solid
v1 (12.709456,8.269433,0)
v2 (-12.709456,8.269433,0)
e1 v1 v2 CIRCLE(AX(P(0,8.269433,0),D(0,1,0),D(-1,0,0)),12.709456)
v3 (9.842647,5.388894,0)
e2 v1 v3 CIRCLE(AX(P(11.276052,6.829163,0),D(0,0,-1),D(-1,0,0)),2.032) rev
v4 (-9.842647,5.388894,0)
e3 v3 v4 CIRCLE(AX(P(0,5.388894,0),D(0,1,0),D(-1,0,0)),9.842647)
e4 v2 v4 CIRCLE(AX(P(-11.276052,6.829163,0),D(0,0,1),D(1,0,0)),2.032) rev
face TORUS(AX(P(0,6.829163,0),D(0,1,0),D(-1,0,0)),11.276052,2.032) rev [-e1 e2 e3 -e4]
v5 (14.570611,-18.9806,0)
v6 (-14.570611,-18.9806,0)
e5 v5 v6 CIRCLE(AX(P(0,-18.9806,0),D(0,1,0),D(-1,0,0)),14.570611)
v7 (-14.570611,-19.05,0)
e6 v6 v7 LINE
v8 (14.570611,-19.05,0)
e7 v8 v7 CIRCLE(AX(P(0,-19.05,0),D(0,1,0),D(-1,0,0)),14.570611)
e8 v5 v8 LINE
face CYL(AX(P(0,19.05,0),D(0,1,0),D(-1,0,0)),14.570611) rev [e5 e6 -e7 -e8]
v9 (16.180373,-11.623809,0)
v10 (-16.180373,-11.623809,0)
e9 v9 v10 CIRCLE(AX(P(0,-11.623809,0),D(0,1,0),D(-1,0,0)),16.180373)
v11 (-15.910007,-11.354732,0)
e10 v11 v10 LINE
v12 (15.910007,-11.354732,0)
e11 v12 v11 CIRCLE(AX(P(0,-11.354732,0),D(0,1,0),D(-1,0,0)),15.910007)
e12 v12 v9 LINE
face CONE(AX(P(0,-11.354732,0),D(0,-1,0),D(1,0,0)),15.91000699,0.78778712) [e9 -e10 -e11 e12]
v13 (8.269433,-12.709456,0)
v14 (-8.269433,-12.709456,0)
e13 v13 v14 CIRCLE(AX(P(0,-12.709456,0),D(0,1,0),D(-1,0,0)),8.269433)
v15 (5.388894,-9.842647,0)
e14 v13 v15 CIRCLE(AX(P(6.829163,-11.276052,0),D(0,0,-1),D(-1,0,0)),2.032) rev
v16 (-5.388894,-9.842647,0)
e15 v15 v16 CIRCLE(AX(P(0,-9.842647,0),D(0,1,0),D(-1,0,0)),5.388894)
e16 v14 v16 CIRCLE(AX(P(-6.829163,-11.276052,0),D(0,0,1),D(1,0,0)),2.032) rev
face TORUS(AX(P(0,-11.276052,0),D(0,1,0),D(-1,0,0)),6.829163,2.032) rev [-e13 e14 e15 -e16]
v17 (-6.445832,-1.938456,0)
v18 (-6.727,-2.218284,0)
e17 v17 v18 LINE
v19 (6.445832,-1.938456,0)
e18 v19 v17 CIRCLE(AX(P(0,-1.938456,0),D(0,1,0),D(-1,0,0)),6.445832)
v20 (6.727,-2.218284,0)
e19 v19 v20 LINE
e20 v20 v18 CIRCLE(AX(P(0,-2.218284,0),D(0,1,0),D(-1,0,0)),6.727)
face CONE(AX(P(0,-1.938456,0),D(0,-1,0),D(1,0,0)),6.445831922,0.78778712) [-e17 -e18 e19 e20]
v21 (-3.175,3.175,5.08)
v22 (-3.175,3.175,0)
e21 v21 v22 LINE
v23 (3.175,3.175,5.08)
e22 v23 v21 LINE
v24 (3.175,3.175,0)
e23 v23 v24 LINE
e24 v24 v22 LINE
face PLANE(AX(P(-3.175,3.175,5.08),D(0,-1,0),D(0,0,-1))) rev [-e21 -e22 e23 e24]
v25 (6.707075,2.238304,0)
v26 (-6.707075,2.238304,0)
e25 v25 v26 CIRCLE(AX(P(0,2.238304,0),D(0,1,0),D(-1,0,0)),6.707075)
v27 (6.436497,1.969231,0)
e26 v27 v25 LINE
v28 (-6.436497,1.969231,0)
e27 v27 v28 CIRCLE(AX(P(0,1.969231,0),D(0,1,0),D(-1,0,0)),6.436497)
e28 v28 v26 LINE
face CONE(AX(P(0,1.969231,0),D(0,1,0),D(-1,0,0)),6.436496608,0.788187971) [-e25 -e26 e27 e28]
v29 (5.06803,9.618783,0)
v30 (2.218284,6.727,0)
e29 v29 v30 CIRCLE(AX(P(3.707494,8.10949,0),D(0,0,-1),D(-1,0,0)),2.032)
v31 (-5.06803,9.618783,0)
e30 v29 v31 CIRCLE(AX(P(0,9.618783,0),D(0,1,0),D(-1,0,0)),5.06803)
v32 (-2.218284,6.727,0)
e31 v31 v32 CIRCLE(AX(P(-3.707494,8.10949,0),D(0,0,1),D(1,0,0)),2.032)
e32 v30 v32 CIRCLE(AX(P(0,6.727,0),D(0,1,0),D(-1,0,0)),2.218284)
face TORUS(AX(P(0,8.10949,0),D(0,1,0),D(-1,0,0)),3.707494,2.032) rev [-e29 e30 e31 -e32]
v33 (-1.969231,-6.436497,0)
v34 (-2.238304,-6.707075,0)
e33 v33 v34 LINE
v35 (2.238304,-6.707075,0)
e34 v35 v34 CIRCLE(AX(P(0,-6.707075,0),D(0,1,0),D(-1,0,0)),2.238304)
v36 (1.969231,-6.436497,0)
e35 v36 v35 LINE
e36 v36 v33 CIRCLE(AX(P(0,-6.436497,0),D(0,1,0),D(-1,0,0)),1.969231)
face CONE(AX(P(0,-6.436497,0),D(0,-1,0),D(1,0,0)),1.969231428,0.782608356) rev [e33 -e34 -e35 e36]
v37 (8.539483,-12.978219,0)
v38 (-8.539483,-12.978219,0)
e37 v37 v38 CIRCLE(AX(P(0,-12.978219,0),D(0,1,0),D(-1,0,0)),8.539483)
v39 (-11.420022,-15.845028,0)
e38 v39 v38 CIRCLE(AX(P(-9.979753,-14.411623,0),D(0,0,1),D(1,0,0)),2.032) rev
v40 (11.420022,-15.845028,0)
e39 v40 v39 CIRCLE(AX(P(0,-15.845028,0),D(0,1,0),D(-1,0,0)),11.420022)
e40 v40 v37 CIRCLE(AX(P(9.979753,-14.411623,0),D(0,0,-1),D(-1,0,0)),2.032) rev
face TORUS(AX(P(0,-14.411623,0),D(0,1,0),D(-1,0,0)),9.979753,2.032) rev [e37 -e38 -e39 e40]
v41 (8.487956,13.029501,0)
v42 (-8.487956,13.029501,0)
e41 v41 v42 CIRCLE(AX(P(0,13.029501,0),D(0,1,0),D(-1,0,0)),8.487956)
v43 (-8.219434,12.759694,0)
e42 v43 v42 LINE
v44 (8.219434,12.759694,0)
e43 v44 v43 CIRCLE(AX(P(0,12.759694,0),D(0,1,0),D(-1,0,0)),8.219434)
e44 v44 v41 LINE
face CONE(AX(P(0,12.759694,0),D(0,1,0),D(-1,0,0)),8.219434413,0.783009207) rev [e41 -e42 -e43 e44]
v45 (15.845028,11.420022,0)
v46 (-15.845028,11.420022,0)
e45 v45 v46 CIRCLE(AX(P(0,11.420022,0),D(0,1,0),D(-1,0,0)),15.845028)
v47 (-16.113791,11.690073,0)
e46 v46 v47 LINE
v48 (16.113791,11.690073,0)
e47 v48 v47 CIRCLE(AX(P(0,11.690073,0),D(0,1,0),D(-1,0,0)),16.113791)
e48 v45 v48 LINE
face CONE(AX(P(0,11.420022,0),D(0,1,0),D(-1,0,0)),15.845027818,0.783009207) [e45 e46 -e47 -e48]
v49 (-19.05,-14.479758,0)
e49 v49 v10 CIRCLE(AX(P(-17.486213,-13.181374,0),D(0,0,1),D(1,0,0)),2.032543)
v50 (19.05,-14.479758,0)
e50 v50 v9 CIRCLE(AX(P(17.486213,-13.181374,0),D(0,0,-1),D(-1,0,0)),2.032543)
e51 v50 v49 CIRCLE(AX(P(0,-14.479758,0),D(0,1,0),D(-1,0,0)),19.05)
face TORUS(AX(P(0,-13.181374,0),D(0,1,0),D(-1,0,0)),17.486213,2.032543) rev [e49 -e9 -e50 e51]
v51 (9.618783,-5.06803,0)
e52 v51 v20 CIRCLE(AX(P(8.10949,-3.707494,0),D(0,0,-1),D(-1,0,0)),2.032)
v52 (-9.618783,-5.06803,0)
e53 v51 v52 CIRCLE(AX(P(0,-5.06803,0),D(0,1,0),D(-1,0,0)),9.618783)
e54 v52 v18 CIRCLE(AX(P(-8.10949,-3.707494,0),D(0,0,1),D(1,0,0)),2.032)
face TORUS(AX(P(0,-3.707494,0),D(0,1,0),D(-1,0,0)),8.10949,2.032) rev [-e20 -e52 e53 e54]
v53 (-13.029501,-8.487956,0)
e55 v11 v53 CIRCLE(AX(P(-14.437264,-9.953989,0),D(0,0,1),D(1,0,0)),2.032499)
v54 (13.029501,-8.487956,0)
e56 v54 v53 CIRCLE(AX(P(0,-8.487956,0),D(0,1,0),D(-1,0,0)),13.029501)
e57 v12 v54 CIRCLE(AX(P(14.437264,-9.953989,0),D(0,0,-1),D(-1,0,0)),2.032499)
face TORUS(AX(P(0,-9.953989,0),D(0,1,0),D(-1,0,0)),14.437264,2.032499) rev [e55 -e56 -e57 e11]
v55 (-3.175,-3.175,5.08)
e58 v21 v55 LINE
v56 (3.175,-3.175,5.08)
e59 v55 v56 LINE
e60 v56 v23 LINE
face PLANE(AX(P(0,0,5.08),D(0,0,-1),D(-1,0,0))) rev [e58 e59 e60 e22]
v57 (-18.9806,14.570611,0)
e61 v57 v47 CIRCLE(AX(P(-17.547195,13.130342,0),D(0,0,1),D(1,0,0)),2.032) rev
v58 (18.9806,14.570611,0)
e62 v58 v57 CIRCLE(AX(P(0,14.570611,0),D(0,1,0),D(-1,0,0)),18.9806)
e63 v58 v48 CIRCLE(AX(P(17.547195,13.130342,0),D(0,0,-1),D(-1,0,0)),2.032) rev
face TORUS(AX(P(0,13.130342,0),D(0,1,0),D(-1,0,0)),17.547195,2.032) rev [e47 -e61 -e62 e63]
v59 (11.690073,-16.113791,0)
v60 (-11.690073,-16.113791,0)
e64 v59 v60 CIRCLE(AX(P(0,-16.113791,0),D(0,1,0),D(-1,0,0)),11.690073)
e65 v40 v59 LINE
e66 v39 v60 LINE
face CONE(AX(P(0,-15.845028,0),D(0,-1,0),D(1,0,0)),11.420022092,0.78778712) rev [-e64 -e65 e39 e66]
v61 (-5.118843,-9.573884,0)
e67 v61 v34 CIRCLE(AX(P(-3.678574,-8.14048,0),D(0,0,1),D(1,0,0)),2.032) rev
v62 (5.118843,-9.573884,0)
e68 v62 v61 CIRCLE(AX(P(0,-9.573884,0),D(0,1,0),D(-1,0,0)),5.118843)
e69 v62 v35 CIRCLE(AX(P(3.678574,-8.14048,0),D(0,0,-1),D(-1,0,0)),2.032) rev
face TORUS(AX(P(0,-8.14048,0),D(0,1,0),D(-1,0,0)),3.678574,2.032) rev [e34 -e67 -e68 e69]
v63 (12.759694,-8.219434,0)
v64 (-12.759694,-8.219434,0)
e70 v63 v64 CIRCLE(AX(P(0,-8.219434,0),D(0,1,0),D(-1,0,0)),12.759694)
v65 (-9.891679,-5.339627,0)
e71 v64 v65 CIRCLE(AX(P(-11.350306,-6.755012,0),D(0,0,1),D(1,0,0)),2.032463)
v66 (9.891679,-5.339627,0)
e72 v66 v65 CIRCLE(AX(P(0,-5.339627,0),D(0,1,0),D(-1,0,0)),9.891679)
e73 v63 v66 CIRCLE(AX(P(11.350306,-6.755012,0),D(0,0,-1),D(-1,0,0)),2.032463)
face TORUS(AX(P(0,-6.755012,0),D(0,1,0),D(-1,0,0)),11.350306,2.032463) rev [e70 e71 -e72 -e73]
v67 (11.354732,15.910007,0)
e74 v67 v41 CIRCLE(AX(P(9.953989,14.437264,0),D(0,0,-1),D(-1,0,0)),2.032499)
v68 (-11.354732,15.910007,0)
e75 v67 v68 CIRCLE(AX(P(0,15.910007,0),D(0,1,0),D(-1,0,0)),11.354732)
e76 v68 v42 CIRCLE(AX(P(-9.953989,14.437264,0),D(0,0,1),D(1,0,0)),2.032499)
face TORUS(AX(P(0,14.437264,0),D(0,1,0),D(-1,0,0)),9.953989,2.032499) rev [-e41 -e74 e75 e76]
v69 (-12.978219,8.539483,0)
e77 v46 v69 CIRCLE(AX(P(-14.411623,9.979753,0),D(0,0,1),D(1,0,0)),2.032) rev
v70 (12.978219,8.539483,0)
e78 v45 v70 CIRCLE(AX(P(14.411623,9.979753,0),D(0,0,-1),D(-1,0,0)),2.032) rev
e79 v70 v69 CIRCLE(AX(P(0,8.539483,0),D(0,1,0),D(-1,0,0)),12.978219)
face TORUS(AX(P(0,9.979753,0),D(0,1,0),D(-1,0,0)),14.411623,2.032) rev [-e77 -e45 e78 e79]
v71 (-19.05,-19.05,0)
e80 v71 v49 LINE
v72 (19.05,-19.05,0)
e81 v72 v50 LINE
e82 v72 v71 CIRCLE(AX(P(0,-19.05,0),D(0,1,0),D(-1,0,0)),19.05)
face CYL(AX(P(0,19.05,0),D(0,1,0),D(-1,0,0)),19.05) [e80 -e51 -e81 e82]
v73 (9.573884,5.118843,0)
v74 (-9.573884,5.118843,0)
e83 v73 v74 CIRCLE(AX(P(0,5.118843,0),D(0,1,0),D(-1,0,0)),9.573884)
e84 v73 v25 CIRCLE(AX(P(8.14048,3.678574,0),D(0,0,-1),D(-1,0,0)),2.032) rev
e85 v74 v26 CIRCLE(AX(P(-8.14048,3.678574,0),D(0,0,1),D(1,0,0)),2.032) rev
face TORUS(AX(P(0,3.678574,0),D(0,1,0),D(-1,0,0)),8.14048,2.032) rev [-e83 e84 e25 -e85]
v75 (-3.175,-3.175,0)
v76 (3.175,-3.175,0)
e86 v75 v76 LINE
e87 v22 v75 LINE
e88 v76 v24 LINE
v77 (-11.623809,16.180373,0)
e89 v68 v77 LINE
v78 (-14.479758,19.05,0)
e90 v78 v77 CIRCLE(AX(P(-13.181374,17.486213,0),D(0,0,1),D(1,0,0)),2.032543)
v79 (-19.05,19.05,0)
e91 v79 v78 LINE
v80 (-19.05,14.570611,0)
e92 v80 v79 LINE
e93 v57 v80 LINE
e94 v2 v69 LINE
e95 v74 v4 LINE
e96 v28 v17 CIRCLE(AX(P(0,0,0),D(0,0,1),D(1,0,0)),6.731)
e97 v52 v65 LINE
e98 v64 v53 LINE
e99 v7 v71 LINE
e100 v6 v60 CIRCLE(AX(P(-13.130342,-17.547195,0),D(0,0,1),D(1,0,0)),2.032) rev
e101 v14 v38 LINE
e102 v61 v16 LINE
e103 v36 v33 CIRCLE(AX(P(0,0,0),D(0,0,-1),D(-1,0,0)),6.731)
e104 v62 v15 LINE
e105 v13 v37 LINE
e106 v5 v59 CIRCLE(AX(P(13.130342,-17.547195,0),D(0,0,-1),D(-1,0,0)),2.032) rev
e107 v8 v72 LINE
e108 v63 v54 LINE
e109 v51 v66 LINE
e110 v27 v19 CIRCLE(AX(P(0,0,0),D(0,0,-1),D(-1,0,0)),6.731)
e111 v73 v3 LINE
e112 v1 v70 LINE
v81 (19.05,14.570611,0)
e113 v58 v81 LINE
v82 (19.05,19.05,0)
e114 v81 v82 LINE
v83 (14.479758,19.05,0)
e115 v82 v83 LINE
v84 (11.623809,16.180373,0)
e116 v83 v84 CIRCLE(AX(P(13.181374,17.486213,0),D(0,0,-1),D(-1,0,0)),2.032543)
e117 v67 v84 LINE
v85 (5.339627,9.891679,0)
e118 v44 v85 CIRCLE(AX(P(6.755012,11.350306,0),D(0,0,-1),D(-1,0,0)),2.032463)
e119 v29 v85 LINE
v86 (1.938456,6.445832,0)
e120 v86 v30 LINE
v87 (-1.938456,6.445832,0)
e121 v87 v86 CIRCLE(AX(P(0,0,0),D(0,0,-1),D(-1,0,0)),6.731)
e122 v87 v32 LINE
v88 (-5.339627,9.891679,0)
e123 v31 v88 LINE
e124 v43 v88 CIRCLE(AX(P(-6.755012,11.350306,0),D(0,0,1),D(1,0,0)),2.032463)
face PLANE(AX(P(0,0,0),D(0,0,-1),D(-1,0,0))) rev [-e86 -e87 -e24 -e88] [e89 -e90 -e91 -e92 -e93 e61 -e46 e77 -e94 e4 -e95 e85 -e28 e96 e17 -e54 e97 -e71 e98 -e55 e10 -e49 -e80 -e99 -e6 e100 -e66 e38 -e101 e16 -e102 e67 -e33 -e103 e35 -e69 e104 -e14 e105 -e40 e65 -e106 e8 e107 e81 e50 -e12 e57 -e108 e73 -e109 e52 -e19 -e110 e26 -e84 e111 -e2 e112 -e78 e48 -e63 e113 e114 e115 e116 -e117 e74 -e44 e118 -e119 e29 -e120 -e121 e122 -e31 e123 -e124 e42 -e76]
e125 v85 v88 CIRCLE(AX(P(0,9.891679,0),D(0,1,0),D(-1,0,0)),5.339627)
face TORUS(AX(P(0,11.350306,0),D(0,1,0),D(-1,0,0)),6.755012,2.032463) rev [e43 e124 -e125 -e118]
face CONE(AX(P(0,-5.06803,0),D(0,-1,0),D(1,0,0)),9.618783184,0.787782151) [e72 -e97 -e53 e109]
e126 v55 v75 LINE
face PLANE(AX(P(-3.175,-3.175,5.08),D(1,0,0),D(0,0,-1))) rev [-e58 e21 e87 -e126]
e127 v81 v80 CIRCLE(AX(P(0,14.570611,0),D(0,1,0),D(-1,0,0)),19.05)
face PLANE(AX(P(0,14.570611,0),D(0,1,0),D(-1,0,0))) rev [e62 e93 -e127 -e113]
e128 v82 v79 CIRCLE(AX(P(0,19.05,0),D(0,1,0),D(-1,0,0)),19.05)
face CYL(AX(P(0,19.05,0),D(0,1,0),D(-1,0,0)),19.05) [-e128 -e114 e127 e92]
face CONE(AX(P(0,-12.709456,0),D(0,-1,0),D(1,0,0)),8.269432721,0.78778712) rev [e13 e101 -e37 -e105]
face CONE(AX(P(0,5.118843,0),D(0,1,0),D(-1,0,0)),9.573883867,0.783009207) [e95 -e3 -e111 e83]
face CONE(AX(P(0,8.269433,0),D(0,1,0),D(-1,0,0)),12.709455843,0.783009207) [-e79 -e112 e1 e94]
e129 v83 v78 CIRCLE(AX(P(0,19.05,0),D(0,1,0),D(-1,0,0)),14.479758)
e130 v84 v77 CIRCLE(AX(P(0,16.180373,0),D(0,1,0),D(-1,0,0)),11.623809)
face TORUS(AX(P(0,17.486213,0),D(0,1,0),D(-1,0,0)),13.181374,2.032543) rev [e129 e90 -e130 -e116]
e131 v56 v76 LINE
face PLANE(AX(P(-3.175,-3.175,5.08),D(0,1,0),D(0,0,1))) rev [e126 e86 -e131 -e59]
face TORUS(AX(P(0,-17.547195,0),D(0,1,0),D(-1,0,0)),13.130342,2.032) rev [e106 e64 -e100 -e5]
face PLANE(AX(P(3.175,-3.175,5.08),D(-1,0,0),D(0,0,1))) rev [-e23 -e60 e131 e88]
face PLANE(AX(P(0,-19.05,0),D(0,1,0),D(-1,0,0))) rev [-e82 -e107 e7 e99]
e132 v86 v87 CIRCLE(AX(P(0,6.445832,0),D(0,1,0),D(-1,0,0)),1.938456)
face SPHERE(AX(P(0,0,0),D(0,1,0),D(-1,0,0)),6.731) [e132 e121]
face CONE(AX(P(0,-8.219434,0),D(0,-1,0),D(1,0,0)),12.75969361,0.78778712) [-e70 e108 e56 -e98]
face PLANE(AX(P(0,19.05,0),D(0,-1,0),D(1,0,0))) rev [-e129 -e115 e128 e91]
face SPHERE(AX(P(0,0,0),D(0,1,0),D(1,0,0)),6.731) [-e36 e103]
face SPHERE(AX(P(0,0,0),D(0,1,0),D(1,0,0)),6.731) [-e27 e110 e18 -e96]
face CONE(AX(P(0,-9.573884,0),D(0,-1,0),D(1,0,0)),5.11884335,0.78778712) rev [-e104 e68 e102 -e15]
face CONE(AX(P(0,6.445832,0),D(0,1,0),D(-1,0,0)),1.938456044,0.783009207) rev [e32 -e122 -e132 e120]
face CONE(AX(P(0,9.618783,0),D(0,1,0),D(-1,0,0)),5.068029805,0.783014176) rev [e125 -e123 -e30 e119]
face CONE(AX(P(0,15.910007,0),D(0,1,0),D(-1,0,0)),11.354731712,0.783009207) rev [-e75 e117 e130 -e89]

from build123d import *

# Parameters (mm, degrees)
SPHERICON_REVOLVE_ANGLE = 180
SKETCH2_W               = 6.35
SKETCH2_H               = 6.35
MALE_EXTRUDE_DEPTH      = 5.08


with BuildPart() as part:
    # Sketch1 → Sphericon Revolve (revolve)
    with BuildSketch(Plane.XY):
        with BuildLine():
            Line((-19.05, 14.570611464), (-18.980599794, 14.570611464))
            ThreePointArc((-18.980599794, 14.570611464), (-16.106926035, 14.563746368), (-16.11379113, 11.69007261))
            Line((-16.11379113, 11.69007261), (-15.845027818, 11.420022092))
            ThreePointArc((-15.845027818, 11.420022092), (-12.97135406, 11.413156997), (-12.978219155, 8.539483239))
            Line((-12.978219155, 8.539483239), (-12.709455843, 8.269432721))
            ThreePointArc((-12.709455843, 8.269432721), (-9.835782084, 8.262567626), (-9.842647179, 5.388893867))
            Line((-9.842647179, 5.388893867), (-9.573883867, 5.11884335))
            ThreePointArc((-9.573883867, 5.11884335), (-6.700210109, 5.111978254), (-6.707075204, 2.238304496))
            Line((-6.707075204, 2.238304496), (-6.436496608, 1.969231428))
            ThreePointArc((-6.436496608, 1.969231428), (-6.730980793, 0.016080052), (-6.445831922, -1.938456044))
            Line((-6.445831922, -1.938456044), (-6.727000174, -2.218284098))
            ThreePointArc((-6.727000174, -2.218284098), (-6.683206893, -5.154816446), (-9.618783184, -5.068029805))
            Line((-9.618783184, -5.068029805), (-9.891678831, -5.339627385))
            ThreePointArc((-9.891678831, -5.339627385), (-9.910192139, -8.189228808), (-12.75969361, -8.219434413))
            Line((-12.75969361, -8.219434413), (-13.029501015, -8.487955771))
            ThreePointArc((-13.029501015, -8.487955771), (-13.003508284, -11.394611844), (-15.91000699, -11.354731712))
            Line((-15.91000699, -11.354731712), (-16.180372544, -11.623808559))
            ThreePointArc((-16.180372544, -11.623808559), (-16.052425661, -14.622028438), (-19.05, -14.479757834))
            Line((-19.05, -14.479757834), (-19.05, -19.05))
            Line((-19.05, -19.05), (-14.570611464, -19.05))
            Line((-14.570611464, -19.05), (-14.570611464, -18.980599794))
            ThreePointArc((-14.570611464, -18.980599794), (-14.563746368, -16.106926035), (-11.69007261, -16.11379113))
            Line((-11.69007261, -16.11379113), (-11.420022092, -15.845027818))
            ThreePointArc((-11.420022092, -15.845027818), (-11.413156997, -12.97135406), (-8.539483239, -12.978219155))
            Line((-8.539483239, -12.978219155), (-8.269432721, -12.709455843))
            ThreePointArc((-8.269432721, -12.709455843), (-8.262567626, -9.835782084), (-5.388893867, -9.842647179))
            Line((-5.388893867, -9.842647179), (-5.11884335, -9.573883867))
            ThreePointArc((-5.11884335, -9.573883867), (-5.111978254, -6.700210109), (-2.238304496, -6.707075204))
            Line((-2.238304496, -6.707075204), (-1.969231428, -6.436496608))
            ThreePointArc((-1.969231428, -6.436496608), (-0.995565752, -6.656967015), (0, -6.731))
            Line((0, -6.731), (0, 6.731))
            ThreePointArc((0, 6.731), (-0.97965972, 6.65932638), (-1.938456044, 6.445831922))
            Line((-1.938456044, 6.445831922), (-2.218284098, 6.727000174))
            ThreePointArc((-2.218284098, 6.727000174), (-5.154816446, 6.683206893), (-5.068029805, 9.618783184))
            Line((-5.068029805, 9.618783184), (-5.339627385, 9.891678831))
            ThreePointArc((-5.339627385, 9.891678831), (-8.189228808, 9.910192139), (-8.219434413, 12.75969361))
            Line((-8.219434413, 12.75969361), (-8.487955771, 13.029501015))
            ThreePointArc((-8.487955771, 13.029501015), (-11.394611844, 13.003508284), (-11.354731712, 15.91000699))
            Line((-11.354731712, 15.91000699), (-11.623808559, 16.180372544))
            ThreePointArc((-11.623808559, 16.180372544), (-14.622028438, 16.052425661), (-14.479757834, 19.05))
            Line((-14.479757834, 19.05), (-19.05, 19.05))
            Line((-19.05, 19.05), (-19.05, 14.570611464))
        make_face()
    revolve(axis=Axis((0, 19.05, 0), (0, -1, 0)), revolution_arc=SPHERICON_REVOLVE_ANGLE)

    # Sketch2 → Male Extrude (add)
    with BuildSketch(Plane.XY):
        Rectangle(SKETCH2_W, SKETCH2_H)
    extrude(amount=MALE_EXTRUDE_DEPTH)


solid = part.part
